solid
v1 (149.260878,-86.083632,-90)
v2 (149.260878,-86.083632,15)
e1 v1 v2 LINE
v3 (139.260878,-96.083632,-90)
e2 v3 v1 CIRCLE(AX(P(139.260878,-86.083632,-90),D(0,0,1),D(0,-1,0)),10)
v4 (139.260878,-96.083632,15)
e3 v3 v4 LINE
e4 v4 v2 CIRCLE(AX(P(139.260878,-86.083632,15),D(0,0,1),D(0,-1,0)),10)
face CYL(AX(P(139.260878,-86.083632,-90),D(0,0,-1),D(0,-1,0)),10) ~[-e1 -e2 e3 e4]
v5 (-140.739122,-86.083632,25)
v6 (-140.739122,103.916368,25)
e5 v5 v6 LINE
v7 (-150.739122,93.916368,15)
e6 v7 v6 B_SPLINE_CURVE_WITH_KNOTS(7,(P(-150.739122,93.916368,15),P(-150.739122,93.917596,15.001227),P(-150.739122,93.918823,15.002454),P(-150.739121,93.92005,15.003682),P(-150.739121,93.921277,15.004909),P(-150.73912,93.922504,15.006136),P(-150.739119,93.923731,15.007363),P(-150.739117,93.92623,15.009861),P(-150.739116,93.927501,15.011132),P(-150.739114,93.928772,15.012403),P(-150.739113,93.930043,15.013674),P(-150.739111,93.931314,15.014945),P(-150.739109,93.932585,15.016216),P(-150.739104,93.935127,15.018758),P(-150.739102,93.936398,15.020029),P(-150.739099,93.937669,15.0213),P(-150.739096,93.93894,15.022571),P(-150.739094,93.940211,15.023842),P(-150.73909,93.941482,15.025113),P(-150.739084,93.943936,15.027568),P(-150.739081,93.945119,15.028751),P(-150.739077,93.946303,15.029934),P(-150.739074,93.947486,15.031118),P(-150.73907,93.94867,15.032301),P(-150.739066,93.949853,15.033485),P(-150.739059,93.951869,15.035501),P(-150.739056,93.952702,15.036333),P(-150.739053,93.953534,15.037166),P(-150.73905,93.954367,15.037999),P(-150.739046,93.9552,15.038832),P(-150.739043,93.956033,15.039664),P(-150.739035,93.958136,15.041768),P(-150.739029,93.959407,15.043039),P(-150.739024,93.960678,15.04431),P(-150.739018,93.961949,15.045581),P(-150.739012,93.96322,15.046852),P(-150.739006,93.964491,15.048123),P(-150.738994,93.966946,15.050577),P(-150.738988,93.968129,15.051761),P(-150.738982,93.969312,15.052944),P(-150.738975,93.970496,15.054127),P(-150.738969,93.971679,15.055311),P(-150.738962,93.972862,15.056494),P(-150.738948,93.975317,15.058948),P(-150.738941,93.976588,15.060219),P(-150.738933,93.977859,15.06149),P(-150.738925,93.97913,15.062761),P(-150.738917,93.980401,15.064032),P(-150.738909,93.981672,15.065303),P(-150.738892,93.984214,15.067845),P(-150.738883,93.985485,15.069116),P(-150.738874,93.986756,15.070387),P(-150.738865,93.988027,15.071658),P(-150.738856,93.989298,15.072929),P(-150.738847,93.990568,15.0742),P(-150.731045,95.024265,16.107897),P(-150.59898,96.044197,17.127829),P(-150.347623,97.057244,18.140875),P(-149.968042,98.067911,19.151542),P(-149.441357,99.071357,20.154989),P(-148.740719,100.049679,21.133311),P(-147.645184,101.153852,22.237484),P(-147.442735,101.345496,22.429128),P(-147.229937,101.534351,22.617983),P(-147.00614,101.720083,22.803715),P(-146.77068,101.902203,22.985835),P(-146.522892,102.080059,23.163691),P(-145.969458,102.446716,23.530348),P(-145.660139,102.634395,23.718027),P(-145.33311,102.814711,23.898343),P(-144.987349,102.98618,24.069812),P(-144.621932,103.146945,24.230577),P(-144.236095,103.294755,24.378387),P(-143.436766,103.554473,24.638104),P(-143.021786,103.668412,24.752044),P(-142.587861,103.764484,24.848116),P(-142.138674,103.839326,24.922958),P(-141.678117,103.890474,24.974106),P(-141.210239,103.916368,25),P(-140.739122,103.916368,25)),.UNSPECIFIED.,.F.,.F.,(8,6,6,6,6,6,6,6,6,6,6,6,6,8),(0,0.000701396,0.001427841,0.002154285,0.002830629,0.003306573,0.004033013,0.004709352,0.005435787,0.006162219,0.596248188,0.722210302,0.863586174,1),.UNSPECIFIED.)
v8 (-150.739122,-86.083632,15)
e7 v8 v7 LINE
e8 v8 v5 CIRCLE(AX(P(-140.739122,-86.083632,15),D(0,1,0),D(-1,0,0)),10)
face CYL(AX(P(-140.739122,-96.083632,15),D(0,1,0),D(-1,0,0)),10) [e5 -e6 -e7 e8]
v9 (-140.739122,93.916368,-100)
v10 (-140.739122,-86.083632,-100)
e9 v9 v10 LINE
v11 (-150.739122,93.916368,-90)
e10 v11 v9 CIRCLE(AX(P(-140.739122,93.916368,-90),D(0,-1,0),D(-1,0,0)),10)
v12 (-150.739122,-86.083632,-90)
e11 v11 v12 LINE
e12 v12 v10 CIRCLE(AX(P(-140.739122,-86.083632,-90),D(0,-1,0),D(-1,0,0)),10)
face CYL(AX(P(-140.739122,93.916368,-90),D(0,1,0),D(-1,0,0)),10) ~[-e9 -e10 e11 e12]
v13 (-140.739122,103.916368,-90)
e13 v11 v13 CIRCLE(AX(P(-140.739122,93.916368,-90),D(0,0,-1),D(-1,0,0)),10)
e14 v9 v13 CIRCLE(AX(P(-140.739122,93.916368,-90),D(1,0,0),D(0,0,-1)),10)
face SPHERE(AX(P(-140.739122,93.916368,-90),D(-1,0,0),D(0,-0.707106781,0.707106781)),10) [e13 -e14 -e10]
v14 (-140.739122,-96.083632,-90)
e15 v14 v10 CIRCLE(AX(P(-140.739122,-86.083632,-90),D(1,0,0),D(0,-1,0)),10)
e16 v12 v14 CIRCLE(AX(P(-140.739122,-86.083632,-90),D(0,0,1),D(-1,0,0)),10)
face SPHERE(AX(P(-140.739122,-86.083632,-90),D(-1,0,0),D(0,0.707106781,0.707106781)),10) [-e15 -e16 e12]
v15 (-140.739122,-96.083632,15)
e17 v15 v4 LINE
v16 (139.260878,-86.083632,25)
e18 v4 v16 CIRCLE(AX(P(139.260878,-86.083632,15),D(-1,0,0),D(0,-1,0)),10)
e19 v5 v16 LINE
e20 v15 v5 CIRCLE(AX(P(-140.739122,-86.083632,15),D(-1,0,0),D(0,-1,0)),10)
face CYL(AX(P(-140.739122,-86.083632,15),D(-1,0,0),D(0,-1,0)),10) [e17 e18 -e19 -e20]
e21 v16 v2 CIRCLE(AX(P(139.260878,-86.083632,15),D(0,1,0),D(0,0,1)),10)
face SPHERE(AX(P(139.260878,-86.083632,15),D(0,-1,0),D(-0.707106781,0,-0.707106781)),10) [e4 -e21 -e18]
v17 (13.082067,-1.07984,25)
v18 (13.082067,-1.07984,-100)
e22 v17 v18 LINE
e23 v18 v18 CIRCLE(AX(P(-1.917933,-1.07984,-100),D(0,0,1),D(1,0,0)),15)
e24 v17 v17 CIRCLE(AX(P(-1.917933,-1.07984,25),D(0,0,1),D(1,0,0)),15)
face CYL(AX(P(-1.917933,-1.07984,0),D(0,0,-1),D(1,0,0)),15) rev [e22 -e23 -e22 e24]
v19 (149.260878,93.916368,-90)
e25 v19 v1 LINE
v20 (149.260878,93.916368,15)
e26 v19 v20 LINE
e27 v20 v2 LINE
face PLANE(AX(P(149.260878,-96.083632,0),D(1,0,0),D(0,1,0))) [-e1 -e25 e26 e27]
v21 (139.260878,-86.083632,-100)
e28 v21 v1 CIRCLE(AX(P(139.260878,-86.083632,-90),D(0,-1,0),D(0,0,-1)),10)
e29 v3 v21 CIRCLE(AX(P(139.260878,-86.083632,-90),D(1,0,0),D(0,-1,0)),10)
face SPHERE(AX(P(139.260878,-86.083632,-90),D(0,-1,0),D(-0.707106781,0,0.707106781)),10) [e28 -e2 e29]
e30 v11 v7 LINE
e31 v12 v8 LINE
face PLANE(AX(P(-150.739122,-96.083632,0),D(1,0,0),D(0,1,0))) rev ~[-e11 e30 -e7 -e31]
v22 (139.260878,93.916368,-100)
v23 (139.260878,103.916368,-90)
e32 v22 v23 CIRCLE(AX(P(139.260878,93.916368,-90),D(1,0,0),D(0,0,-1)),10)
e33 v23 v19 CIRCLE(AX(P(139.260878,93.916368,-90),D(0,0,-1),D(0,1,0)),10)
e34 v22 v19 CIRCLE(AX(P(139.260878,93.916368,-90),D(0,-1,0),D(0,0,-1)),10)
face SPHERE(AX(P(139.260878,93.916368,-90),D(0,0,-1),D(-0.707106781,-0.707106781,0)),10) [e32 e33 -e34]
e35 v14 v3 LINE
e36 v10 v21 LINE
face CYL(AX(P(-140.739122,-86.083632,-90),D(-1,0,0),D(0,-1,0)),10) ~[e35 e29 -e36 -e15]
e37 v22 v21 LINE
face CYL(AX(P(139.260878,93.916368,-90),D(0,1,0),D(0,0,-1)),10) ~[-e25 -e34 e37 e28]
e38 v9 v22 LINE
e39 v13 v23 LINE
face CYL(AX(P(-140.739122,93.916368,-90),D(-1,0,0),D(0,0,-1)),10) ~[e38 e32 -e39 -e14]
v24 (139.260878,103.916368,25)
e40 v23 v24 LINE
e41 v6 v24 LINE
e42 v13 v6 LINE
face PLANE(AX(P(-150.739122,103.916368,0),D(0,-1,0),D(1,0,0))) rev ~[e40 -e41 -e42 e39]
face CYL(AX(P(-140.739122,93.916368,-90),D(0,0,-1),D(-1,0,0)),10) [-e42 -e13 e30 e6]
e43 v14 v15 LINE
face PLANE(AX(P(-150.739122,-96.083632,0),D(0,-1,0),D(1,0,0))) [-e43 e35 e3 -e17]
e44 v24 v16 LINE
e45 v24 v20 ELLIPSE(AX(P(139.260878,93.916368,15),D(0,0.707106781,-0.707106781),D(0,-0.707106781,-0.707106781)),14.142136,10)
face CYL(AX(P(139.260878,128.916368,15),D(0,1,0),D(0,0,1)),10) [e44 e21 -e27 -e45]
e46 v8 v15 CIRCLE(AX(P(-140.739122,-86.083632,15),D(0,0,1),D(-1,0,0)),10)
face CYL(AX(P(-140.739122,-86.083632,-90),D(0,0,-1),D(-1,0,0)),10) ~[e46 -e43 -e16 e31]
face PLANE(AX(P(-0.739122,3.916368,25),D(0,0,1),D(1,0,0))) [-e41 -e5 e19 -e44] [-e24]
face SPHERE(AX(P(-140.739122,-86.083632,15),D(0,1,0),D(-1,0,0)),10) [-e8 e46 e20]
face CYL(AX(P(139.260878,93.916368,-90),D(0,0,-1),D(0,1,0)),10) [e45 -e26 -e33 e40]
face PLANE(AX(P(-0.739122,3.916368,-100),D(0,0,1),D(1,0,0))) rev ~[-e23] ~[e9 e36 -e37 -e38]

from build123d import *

# Parameters (mm, degrees)
F0_W         = 300
F0_H         = 200
F0_R         = 15
F1_DEPTH     = 25
F2_DEPTH     = 100
F3_R         = 10
F6_T1_DEPTH  = 105
F6_T3_DEPTH  = 180
F6_T5_DEPTH  = 130
F6_T7_DEPTH  = 280
F6_T9_DEPTH  = 140
F6_T11_DEPTH = 215
F6_S15_W     = 10.2
F6_S15_H     = 10.2
F6_T16_DEPTH = 10.2
F6_S21_W     = 10.2
F6_S21_H     = 10.2
F6_T22_DEPTH = 10.2
F6_S27_W     = 10.2
F6_S27_H     = 10.2
F6_T28_DEPTH = 10.2
F6_S33_W     = 10.2
F6_S33_H     = 10.2
F6_T34_DEPTH = 10.2
F6_S39_W     = 10.2
F6_S39_H     = 10.2
F6_T40_DEPTH = 10.2
F6_T44_ANGLE = 90


# Not quite as in the source:
# - a fillet or chamfer that OpenCascade refuses, or shapes differently, is made with other operations: its cross-section is extruded or revolved along the edge and cut away or added
# - a feature of the source that left no trace in its solid (it failed there, or was rolled back) is left out


with BuildPart() as f1:
    # F0 (on Top) → F1 (new body)
    with BuildSketch(Plane.XY):
        with Locations((-0.7391218096, 3.9163683355)):
            Rectangle(F0_W, F0_H)
        with Locations((-1.9179330509, -1.0798395535)):
            Circle(F0_R, mode=Mode.SUBTRACT)
    extrude(amount=F1_DEPTH)

    # F0 (on Top) → F2 (join)
    with BuildSketch(Plane.XY):
        with Locations((-0.7391218096, 3.9163683355)):
            Rectangle(F0_W, F0_H)
        with Locations((-1.9179330509, -1.0798395535)):
            Circle(F0_R, mode=Mode.SUBTRACT)
    extrude(amount=-F2_DEPTH)

    # F3
    f3_edges = [f1.edges().sort_by_distance(p)[0] for p in [
        (-150.739122, 3.916368, 25),
    ]]
    fillet(f3_edges, radius=F3_R)

    # F6: fillet of radius 10 on 11 edges, made by hand

    # F6_s2 → F6_t1 (cut)
    with BuildSketch(Plane.XY.offset(-90)):
        with BuildLine():
            ThreePointArc((-150.7391218096, -86.0836316645), (-147.8101896215, -93.1546994763), (-140.7391218096, -96.0836316645))
            Line((-140.7391218096, -96.0836316645), (-150.7391218096, -96.0836316645))
            Line((-150.7391218096, -96.0836316645), (-150.7391218096, -86.0836316645))
        make_face()
        with BuildLine():
            ThreePointArc((139.2608781904, -96.0836316645), (146.3319460023, -93.1546994763), (149.2608781904, -86.0836316645))
            Line((149.2608781904, -86.0836316645), (149.2608781904, -96.0836316645))
            Line((149.2608781904, -96.0836316645), (139.2608781904, -96.0836316645))
        make_face()
    extrude(amount=F6_T1_DEPTH, mode=Mode.SUBTRACT)

    # F6_s4 → F6_t3 (cut)
    with BuildSketch(Plane.XZ.offset(-93.9163683355)):
        with BuildLine():
            ThreePointArc((-150.7391218096, -90), (-147.8101896215, -97.0710678119), (-140.7391218096, -100))
            Line((-140.7391218096, -100), (-150.7391218096, -100))
            Line((-150.7391218096, -100), (-150.7391218096, -90))
        make_face()
        with BuildLine():
            ThreePointArc((139.2608781904, -100), (146.3319460023, -97.0710678119), (149.2608781904, -90))
            Line((149.2608781904, -90), (149.2608781904, -100))
            Line((149.2608781904, -100), (139.2608781904, -100))
        make_face()
    extrude(amount=F6_T3_DEPTH, mode=Mode.SUBTRACT)

    # F6_s6 → F6_t5 (cut)
    with BuildSketch(Plane.XY.offset(-90)):
        with BuildLine():
            ThreePointArc((-150.7391218096, 93.9163683355), (-147.8101896215, 100.9874361474), (-140.7391218096, 103.9163683355))
            Line((-140.7391218096, 103.9163683355), (-150.7391218096, 103.9163683355))
            Line((-150.7391218096, 103.9163683355), (-150.7391218096, 93.9163683355))
        make_face()
    extrude(amount=F6_T5_DEPTH, mode=Mode.SUBTRACT)

    # F6_s8 → F6_t7 (cut)
    with BuildSketch(Plane.YZ.offset(-140.7391218096)):
        with BuildLine():
            ThreePointArc((-96.0836316645, -90), (-93.1546994763, -97.0710678119), (-86.0836316645, -100))
            Line((-86.0836316645, -100), (-96.0836316645, -100))
            Line((-96.0836316645, -100), (-96.0836316645, -90))
        make_face()
        with BuildLine():
            ThreePointArc((-96.0836316645, 15), (-93.1546994763, 22.0710678119), (-86.0836316645, 25))
            Line((-86.0836316645, 25), (-96.0836316645, 25))
            Line((-96.0836316645, 25), (-96.0836316645, 15))
        make_face()
        with BuildLine():
            ThreePointArc((93.9163683355, -100), (100.9874361474, -97.0710678119), (103.9163683355, -90))
            Line((103.9163683355, -90), (103.9163683355, -100))
            Line((103.9163683355, -100), (93.9163683355, -100))
        make_face()
    extrude(amount=F6_T7_DEPTH, mode=Mode.SUBTRACT)

    # F6_s10 → F6_t9 (cut)
    with BuildSketch(Plane.XY.offset(-90)):
        with BuildLine():
            ThreePointArc((139.2608781904, 103.9163683355), (146.3319460023, 100.9874361474), (149.2608781904, 93.9163683355))
            Line((149.2608781904, 93.9163683355), (149.2608781904, 103.9163683355))
            Line((149.2608781904, 103.9163683355), (139.2608781904, 103.9163683355))
        make_face()
    extrude(amount=F6_T9_DEPTH, mode=Mode.SUBTRACT)

    # F6_s12 → F6_t11 (cut)
    with BuildSketch(Plane.XZ.offset(-128.9163683355)):
        with BuildLine():
            ThreePointArc((139.2608781904, 25), (146.3319460023, 22.0710678119), (149.2608781904, 15))
            Line((149.2608781904, 15), (149.2608781904, 25))
            Line((149.2608781904, 25), (139.2608781904, 25))
        make_face()
    extrude(amount=F6_T11_DEPTH, mode=Mode.SUBTRACT)


with BuildPart() as f6_tool14:
    # F6_s15 → F6_t16 (new body)
    with BuildSketch(Plane.YZ.offset(-140.7391218096)):
        with Locations((-91.1836316645, -95.1)):
            Rectangle(F6_S15_W, F6_S15_H)
    extrude(amount=-F6_T16_DEPTH)

    # F6_s17 → F6_t18 (revolve, cut)
    with BuildSketch(Plane(origin=(-140.7391218096, -86.0836316645, -90), x_dir=(0, 0.7071067812, 0.7071067812), z_dir=(0, -0.7071067812, 0.7071067812))):
        with BuildLine():
            ThreePointArc((0, -10), (10, 0), (0, 10))
            Line((0, 10), (0, -10))
        make_face()
    revolve(axis=Axis((-140.7391218096, -86.0836316645, -90), (-1, 0, 0)), mode=Mode.SUBTRACT)


with BuildPart() as f1_1:
    add(f1.part)

    # F6_t13: cut F6_tool14
    add(f6_tool14.part, mode=Mode.SUBTRACT)


with BuildPart() as f6_tool20:
    # F6_s21 → F6_t22 (new body)
    with BuildSketch(Plane.YZ.offset(-140.7391218096)):
        with Locations((99.0163683355, -95.1)):
            Rectangle(F6_S21_W, F6_S21_H)
    extrude(amount=-F6_T22_DEPTH)

    # F6_s23 → F6_t24 (revolve, cut)
    with BuildSketch(Plane(origin=(-140.7391218096, 93.9163683355, -90), x_dir=(0, -0.7071067812, 0.7071067812), z_dir=(0, -0.7071067812, -0.7071067812))):
        with BuildLine():
            ThreePointArc((0, -10), (10, 0), (0, 10))
            Line((0, 10), (0, -10))
        make_face()
    revolve(axis=Axis((-140.7391218096, 93.9163683355, -90), (-1, 0, 0)), mode=Mode.SUBTRACT)


with BuildPart() as f1_2:
    add(f1_1.part)

    # F6_t19: cut F6_tool20
    add(f6_tool20.part, mode=Mode.SUBTRACT)


with BuildPart() as f6_tool26:
    # F6_s27 → F6_t28 (new body)
    with BuildSketch(Plane.XZ.offset(86.0836316645)):
        with Locations((144.3608781904, -95.1)):
            Rectangle(F6_S27_W, F6_S27_H)
    extrude(amount=F6_T28_DEPTH)

    # F6_s29 → F6_t30 (revolve, cut)
    with BuildSketch(Plane(origin=(139.2608781904, -86.0836316645, -90), x_dir=(-0.7071067812, 0, 0.7071067812), z_dir=(0.7071067812, 0, 0.7071067812))):
        with BuildLine():
            ThreePointArc((0, -10), (10, 0), (0, 10))
            Line((0, 10), (0, -10))
        make_face()
    revolve(axis=Axis((139.2608781904, -86.0836316645, -90), (0, -1, 0)), mode=Mode.SUBTRACT)


with BuildPart() as f1_3:
    add(f1_2.part)

    # F6_t25: cut F6_tool26
    add(f6_tool26.part, mode=Mode.SUBTRACT)


with BuildPart() as f6_tool32:
    # F6_s33 → F6_t34 (new body)
    with BuildSketch(Plane.XZ.offset(86.0836316645)):
        with Locations((144.3608781904, 20.1)):
            Rectangle(F6_S33_W, F6_S33_H)
    extrude(amount=F6_T34_DEPTH)

    # F6_s35 → F6_t36 (revolve, cut)
    with BuildSketch(Plane(origin=(139.2608781904, -86.0836316645, 15), x_dir=(-0.7071067812, 0, -0.7071067812), z_dir=(-0.7071067812, 0, 0.7071067812))):
        with BuildLine():
            ThreePointArc((0, -10), (10, 0), (0, 10))
            Line((0, 10), (0, -10))
        make_face()
    revolve(axis=Axis((139.2608781904, -86.0836316645, 15), (0, -1, 0)), mode=Mode.SUBTRACT)


with BuildPart() as f1_4:
    add(f1_3.part)

    # F6_t31: cut F6_tool32
    add(f6_tool32.part, mode=Mode.SUBTRACT)


with BuildPart() as f6_tool38:
    # F6_s39 → F6_t40 (new body)
    with BuildSketch(Plane.XY.offset(-90)):
        with Locations((144.3608781904, 99.0163683355)):
            Rectangle(F6_S39_W, F6_S39_H)
    extrude(amount=-F6_T40_DEPTH)

    # F6_s41 → F6_t42 (revolve, cut)
    with BuildSketch(Plane(origin=(139.2608781904, 93.9163683355, -90), x_dir=(-0.7071067812, -0.7071067812, 0), z_dir=(0.7071067812, -0.7071067812, 0))):
        with BuildLine():
            ThreePointArc((0, -10), (10, 0), (0, 10))
            Line((0, 10), (0, -10))
        make_face()
    revolve(axis=Axis((139.2608781904, 93.9163683355, -90), (0, 0, -1)), mode=Mode.SUBTRACT)


with BuildPart() as f1_5:
    add(f1_4.part)

    # F6_t37: cut F6_tool38
    add(f6_tool38.part, mode=Mode.SUBTRACT)

    # F6_s43 → F6_t44 (revolve, cut)
    with BuildSketch(Plane.XY.offset(15)):
        with BuildLine():
            ThreePointArc((-140.7391218096, -96.0836316645), (-147.8101896215, -93.1546994763), (-150.7391218096, -86.0836316645))
            Line((-150.7391218096, -86.0836316645), (-150.7391218096, -96.0836316645))
            Line((-150.7391218096, -96.0836316645), (-140.7391218096, -96.0836316645))
        make_face()
    revolve(axis=Axis((-140.7391218096, -96.0836316645, 15), (0, 1, 0)), revolution_arc=F6_T44_ANGLE, mode=Mode.SUBTRACT)


solid = f1_5.part
